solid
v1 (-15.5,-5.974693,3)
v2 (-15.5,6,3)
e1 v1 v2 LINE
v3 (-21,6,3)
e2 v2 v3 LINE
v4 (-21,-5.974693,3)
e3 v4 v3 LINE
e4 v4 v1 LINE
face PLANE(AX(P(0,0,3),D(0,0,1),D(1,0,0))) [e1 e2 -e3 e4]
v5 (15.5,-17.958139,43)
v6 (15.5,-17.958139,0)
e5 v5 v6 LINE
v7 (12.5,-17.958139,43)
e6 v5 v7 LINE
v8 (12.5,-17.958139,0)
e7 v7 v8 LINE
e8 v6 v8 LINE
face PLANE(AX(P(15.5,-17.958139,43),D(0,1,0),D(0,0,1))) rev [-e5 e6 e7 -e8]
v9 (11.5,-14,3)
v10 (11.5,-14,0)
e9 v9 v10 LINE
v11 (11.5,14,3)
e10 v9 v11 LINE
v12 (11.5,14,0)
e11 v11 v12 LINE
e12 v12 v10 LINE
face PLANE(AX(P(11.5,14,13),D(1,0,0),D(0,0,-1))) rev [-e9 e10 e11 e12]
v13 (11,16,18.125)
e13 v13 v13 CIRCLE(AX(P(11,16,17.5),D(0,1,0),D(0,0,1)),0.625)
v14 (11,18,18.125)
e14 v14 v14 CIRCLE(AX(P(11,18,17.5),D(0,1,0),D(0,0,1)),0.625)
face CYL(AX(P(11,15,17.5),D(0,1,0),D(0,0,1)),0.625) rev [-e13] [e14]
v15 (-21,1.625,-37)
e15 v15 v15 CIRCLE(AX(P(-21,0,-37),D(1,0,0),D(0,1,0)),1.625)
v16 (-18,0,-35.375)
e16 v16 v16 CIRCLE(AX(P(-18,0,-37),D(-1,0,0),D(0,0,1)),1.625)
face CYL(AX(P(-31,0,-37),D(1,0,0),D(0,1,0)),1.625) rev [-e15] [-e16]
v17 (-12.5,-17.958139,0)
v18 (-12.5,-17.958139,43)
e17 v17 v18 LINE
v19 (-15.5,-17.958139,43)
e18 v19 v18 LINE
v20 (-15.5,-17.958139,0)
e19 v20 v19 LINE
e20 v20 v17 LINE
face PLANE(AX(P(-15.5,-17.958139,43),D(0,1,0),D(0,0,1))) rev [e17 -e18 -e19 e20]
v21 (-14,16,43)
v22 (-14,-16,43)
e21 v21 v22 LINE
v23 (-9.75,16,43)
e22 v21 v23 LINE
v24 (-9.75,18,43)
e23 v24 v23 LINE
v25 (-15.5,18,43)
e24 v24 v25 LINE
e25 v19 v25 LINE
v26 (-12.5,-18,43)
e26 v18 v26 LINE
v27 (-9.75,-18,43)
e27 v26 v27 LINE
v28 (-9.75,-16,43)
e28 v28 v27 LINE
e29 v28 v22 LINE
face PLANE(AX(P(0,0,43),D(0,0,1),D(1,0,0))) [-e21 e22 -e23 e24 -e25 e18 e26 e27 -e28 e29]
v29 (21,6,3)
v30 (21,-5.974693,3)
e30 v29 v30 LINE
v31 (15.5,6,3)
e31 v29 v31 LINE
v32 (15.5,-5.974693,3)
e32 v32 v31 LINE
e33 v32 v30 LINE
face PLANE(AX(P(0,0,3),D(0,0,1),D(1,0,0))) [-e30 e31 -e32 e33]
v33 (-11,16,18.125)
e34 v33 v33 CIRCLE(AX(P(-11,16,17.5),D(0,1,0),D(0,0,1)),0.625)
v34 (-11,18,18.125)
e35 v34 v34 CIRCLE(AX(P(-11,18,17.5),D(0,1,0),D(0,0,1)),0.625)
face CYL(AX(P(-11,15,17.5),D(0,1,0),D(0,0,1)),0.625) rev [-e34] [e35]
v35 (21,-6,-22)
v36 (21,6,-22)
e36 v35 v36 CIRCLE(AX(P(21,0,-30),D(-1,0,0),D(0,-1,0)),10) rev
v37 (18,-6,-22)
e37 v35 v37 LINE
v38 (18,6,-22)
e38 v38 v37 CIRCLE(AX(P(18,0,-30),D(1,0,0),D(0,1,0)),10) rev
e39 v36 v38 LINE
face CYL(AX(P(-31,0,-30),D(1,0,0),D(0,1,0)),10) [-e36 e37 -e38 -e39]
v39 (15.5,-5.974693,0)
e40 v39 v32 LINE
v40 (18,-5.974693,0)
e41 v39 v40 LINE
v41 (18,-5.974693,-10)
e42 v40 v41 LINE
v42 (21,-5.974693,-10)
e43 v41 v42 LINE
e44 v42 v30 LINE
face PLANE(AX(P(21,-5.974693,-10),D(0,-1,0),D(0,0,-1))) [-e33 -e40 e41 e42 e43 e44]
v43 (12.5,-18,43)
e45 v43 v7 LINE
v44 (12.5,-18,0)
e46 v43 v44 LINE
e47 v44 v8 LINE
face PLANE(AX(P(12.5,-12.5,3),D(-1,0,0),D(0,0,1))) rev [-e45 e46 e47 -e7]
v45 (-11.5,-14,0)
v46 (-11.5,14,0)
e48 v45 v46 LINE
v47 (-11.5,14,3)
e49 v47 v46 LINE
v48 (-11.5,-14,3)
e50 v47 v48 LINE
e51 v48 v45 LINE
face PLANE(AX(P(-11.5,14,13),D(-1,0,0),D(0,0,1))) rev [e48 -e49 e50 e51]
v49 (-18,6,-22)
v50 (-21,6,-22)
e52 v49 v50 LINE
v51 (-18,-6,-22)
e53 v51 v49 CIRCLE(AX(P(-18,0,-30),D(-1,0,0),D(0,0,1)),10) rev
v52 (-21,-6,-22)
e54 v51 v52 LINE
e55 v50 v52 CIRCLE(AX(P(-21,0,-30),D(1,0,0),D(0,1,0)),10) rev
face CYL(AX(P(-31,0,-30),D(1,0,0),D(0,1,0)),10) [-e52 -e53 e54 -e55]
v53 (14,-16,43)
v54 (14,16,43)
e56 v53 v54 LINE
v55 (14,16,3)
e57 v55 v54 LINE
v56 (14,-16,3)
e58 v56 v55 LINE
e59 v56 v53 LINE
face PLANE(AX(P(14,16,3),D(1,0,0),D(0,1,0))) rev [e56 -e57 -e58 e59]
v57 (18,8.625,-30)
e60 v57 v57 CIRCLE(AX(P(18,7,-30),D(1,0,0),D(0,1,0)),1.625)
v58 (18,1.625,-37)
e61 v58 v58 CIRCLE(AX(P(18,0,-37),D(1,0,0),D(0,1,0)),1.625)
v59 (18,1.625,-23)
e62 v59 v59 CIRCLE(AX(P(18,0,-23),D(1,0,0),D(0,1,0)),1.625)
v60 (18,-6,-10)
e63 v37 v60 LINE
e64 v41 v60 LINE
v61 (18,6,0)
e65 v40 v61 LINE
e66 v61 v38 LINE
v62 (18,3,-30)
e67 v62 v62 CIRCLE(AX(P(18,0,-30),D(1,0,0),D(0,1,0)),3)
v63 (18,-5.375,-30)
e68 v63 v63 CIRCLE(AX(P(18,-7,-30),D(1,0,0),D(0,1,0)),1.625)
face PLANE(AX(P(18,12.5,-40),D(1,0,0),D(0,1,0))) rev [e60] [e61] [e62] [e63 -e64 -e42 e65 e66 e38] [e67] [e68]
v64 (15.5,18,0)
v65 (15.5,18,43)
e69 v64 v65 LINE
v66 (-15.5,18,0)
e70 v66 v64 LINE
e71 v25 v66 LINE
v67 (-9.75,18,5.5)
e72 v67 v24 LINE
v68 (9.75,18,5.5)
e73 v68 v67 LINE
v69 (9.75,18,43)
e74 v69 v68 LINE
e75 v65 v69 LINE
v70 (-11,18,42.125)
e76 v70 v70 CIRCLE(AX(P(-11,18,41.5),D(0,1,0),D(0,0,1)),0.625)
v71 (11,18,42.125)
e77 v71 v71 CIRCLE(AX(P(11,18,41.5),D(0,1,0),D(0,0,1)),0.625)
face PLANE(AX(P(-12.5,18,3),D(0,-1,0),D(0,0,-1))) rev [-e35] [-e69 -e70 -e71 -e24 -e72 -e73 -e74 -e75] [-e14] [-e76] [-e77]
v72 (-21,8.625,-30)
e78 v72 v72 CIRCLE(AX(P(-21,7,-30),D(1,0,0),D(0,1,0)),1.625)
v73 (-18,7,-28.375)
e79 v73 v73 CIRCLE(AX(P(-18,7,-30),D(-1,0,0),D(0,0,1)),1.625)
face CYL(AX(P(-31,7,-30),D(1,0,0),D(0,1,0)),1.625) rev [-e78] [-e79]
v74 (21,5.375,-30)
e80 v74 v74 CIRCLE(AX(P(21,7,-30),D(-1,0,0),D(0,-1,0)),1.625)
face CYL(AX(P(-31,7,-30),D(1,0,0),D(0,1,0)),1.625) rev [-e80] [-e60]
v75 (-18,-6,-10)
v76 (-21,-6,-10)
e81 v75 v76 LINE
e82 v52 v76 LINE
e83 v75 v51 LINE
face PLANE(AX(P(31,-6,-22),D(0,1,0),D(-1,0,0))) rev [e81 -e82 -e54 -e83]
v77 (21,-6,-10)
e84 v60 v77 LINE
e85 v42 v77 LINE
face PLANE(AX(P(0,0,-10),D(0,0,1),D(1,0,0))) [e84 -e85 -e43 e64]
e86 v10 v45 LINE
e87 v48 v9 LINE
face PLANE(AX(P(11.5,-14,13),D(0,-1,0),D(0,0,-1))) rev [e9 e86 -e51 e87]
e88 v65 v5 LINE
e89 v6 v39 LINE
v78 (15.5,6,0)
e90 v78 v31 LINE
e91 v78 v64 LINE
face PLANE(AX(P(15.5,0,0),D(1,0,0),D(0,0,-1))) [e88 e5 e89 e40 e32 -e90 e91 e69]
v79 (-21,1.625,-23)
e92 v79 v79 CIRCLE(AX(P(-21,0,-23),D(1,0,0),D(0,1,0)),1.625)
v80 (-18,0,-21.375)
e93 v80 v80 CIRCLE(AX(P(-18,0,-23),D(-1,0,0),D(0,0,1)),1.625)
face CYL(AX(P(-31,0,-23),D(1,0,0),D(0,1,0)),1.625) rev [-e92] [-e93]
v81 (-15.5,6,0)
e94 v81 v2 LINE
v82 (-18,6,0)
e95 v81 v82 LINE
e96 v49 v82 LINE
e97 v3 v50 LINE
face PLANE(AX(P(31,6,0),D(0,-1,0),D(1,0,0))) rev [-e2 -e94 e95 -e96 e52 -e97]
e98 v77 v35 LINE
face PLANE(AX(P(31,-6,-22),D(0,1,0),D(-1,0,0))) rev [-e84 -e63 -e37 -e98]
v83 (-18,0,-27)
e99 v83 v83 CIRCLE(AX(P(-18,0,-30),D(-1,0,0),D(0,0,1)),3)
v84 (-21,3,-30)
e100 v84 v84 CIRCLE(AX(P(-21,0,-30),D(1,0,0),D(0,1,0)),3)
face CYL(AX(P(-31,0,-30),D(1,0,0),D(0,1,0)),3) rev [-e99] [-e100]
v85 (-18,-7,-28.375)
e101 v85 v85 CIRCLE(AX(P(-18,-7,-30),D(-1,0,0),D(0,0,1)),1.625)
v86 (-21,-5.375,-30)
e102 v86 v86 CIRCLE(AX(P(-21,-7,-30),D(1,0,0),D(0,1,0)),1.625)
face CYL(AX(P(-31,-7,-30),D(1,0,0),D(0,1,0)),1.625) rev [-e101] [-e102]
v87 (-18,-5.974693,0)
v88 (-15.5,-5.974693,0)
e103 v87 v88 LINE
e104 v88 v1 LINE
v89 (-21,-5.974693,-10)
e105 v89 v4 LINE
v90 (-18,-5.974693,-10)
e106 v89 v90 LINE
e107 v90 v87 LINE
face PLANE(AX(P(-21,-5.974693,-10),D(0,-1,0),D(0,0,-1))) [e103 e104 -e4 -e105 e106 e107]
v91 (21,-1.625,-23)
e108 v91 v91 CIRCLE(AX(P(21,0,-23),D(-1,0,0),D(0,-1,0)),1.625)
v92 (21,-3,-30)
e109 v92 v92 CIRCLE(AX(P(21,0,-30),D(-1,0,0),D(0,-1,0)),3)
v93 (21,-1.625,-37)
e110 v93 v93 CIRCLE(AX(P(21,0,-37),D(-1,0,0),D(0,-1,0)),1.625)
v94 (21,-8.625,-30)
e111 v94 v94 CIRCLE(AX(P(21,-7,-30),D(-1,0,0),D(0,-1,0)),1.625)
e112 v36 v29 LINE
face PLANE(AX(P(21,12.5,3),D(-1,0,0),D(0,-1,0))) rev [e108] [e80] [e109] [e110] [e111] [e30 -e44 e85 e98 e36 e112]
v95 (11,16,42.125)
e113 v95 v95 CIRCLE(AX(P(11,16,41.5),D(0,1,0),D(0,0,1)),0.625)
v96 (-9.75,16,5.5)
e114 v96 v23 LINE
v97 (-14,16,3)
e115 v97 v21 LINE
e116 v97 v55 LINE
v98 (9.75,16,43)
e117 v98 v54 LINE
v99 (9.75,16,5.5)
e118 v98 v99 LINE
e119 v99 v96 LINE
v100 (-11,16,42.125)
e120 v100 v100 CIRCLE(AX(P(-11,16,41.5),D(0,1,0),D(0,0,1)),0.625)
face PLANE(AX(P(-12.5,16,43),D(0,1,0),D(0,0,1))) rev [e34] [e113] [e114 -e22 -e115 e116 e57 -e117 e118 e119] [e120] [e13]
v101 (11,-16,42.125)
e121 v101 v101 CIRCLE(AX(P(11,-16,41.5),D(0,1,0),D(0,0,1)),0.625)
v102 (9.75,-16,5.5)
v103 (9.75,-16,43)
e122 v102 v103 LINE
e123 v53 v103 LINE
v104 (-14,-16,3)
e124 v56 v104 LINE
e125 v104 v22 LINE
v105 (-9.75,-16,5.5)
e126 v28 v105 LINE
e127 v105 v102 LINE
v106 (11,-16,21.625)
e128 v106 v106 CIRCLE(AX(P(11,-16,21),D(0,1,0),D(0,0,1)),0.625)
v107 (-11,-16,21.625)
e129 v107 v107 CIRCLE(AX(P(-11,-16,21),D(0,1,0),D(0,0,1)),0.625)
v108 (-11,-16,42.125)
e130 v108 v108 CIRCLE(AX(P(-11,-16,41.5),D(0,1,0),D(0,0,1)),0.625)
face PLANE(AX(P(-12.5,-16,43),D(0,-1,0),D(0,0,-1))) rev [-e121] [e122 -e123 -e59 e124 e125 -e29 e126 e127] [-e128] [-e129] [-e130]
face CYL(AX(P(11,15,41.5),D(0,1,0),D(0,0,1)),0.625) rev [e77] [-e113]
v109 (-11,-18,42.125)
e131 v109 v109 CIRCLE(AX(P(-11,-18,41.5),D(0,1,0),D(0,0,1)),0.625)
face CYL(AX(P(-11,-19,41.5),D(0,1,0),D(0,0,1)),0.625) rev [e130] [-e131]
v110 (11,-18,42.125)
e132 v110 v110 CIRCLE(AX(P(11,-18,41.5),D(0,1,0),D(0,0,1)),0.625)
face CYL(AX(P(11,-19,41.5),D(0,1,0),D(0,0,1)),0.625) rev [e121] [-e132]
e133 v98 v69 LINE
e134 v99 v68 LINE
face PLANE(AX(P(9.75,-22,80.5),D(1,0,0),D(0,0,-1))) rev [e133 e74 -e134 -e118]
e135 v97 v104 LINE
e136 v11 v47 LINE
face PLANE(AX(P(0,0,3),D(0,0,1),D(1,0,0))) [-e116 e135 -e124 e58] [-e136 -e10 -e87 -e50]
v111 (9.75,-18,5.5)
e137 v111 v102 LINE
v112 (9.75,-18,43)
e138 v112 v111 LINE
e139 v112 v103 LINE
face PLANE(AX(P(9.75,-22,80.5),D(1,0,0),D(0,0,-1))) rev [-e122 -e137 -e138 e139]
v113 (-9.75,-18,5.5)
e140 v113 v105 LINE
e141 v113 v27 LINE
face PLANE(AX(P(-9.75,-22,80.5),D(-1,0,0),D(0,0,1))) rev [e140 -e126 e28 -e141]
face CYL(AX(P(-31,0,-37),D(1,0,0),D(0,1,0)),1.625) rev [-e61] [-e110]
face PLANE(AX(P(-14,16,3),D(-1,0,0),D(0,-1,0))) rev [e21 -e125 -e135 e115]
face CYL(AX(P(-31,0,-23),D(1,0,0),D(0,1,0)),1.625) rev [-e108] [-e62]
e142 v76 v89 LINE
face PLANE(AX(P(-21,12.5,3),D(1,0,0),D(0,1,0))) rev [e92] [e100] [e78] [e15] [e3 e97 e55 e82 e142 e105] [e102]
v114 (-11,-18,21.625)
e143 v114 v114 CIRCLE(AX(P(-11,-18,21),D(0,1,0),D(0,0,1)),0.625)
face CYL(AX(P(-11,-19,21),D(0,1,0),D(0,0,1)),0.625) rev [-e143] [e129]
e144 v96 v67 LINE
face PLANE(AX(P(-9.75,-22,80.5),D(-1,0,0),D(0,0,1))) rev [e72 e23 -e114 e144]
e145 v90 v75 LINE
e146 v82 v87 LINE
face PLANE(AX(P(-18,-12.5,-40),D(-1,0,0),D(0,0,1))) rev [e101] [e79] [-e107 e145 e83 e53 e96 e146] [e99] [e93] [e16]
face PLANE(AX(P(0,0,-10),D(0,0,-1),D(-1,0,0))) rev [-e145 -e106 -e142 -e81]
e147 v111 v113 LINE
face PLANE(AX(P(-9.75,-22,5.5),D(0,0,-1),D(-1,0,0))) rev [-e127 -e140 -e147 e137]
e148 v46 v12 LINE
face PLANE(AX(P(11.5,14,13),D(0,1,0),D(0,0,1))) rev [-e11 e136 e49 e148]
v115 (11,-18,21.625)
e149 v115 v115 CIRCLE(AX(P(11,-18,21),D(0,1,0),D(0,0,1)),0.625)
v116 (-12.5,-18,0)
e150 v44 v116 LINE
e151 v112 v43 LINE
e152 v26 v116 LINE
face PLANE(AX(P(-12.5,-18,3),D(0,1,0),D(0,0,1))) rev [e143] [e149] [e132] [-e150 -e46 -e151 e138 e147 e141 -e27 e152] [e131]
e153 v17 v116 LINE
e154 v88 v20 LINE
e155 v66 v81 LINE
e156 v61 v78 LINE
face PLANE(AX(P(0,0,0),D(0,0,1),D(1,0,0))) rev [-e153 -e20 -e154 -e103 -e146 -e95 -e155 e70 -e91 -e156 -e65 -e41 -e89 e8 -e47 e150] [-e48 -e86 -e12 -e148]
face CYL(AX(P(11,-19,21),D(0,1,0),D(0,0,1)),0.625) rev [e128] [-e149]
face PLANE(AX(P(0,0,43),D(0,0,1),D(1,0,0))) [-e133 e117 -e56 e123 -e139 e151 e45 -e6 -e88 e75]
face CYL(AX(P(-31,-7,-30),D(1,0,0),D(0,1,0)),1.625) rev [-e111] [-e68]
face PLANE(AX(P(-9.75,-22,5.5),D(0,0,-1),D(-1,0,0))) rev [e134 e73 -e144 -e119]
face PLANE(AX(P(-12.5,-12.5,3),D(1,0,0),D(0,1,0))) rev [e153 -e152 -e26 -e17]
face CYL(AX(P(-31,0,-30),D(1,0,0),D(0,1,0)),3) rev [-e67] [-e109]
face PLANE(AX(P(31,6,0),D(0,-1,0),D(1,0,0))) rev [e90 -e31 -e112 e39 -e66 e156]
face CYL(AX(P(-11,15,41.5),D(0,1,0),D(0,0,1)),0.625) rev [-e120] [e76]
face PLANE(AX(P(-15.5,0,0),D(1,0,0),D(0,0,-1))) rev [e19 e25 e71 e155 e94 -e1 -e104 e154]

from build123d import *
from build123d.topology import SkipClean

# Parameters (mm, degrees)
BOSS_EXTRUDE1_DEPTH      = 3
SKETCH2_W                = 25
SKETCH2_H                = 2
BOSS_EXTRUDE2_DEPTH      = 40
SKETCH3_R                = 0.625
CUT_EXTRUDE1_DEPTH       = 3
SKETCH4_R                = 0.625
CUT_EXTRUDE2_DEPTH       = 3
SKETCH5_W                = 3
SKETCH5_H                = 25
BOSS_EXTRUDE3_DEPTH      = 40
SKETCH7_W                = 19.5
SKETCH7_H                = 75
CUT_EXTRUDE5_DEPTH       = 40
SKETCH10_W               = 25
SKETCH10_H               = 3
BOSS_EXTRUDE4_DEPTH      = 10
SKETCH11_W               = 25
SKETCH11_H               = 3
BOSS_EXTRUDE5_DEPTH      = 10
SKETCH12_W               = 3
SKETCH12_H               = 25
BOSS_EXTRUDE6_DEPTH      = 10
SKETCH13_W               = 3
SKETCH13_H               = 25
BOSS_EXTRUDE7_DEPTH      = 10
SKETCH14_W               = 43
SKETCH14_H               = 35.95813892
BOSS_EXTRUDE11_DEPTH     = 3
SKETCH15_W               = 43
SKETCH15_H               = 35.95813892
BOSS_EXTRUDE12_DEPTH     = 3
SKETCH16_W               = 23
SKETCH16_H               = 28
CUT_EXTRUDE6_DEPTH       = 13
CUT_EXTRUDE7_DEPTH       = 74.054773971
CUT_EXTRUDE7_DEPTH_BACK  = 74.054773971
SKETCH6_R                = 1.625
SKETCH6_R_2              = 3
FILLET1_R                = 10
FILLET2_R                = 10
SKETCH17_W               = 3
SKETCH17_H               = 2.5
CUT_EXTRUDE8_DEPTH       = 30
SKETCH19_W               = 28
SKETCH19_H               = 32
CUT_EXTRUDE9_DEPTH       = 40
CUT_EXTRUDE11_DEPTH      = 60.949979149
CUT_EXTRUDE11_DEPTH_BACK = 60.949979149
SKETCH20_W               = 25.25
SKETCH20_H               = 11.847644437
SKETCH20_W_2             = 25
SKETCH20_H_2             = 13.837487399
CUT_EXTRUDE12_DEPTH      = 70.835521048
CUT_EXTRUDE12_DEPTH_BACK = 70.835521048
CUT_EXTRUDE13_DEPTH      = 56.982140009
CUT_EXTRUDE13_DEPTH_BACK = 56.982140009
SKETCH22_W               = 10
SKETCH22_H               = 25
CUT_EXTRUDE14_DEPTH      = 10
CUT_EXTRUDE14_DEPTH_BACK = 10
SKETCH24_W               = 5.5
SKETCH24_H               = 6.5
SKETCH24_H_2             = 6.525307194


with BuildPart() as part:
    # Sketch1 → Boss-Extrude1 (new body)
    with BuildSketch(Plane.XY):
        Polygon((12.5, 12.5), (21, 12.5), (21, -12.5), (12.5, -12.5), (12.5, -18), (-12.5, -18), (-12.5, -12.5), (-21, -12.5), (-21, 12.5), (-12.5, 12.5), (-12.5, 18), (12.5, 18), align=None)
    extrude(amount=BOSS_EXTRUDE1_DEPTH)

    # Sketch2 → Boss-Extrude2 (add)
    with BuildSketch(Plane.XY.offset(3)):
        with Locations((0, 17)):
            Rectangle(SKETCH2_W, SKETCH2_H)
        with Locations((0, -17)):
            Rectangle(SKETCH2_W, SKETCH2_H)
    extrude(amount=BOSS_EXTRUDE2_DEPTH)

    # Sketch3 → Cut-Extrude1 (cut)
    with BuildSketch(Plane(origin=(0, 18, 0), x_dir=(1, 0, 0), z_dir=(0, 1, 0))):
        with Locations(Location((-11, -17.5, 0), (0, 0, 270))):
            Circle(SKETCH3_R)
        with Locations(Location((11, -17.5, 0), (0, 0, 270))):
            Circle(SKETCH3_R)
        with Locations(Location((-11, -41.5, 0), (0, 0, 270))):
            Circle(SKETCH3_R)
        with Locations(Location((11, -41.5, 0), (0, 0, 270))):
            Circle(SKETCH3_R)
    extrude(amount=-CUT_EXTRUDE1_DEPTH, mode=Mode.SUBTRACT)

    # Sketch4 → Cut-Extrude2 (cut)
    with BuildSketch(Plane(origin=(0, -16, 0), x_dir=(1, 0, 0), z_dir=(0, 1, 0))):
        with Locations(Location((-11, -41.5, 0), (0, 0, 270))):
            Circle(SKETCH4_R)
        with Locations(Location((11, -41.5, 0), (0, 0, 270))):
            Circle(SKETCH4_R)
        with Locations(Location((-11, -21, 0), (0, 0, 270))):
            Circle(SKETCH4_R)
        with Locations(Location((11, -21, 0), (0, 0, 270))):
            Circle(SKETCH4_R)
    extrude(amount=-CUT_EXTRUDE2_DEPTH, mode=Mode.SUBTRACT)

    # Sketch5 → Boss-Extrude3 (add)
    with BuildSketch(Plane(origin=(0, 0, 0), x_dir=(-1, 0, 0), z_dir=(0, 0, -1))):
        with Locations((-19.5, 0)):
            Rectangle(SKETCH5_W, SKETCH5_H)
        with Locations((19.5, 0)):
            Rectangle(SKETCH5_W, SKETCH5_H)
    extrude(amount=BOSS_EXTRUDE3_DEPTH)

    # Sketch7 → Cut-Extrude5 (cut)
    with BuildSketch(Plane(origin=(0, 18, 0), x_dir=(1, 0, 0), z_dir=(0, 1, 0))):
        with Locations((0, -43)):
            Rectangle(SKETCH7_W, SKETCH7_H)
    extrude(amount=-CUT_EXTRUDE5_DEPTH, mode=Mode.SUBTRACT)

    # Sketch10 → Boss-Extrude4 (add)
    with BuildSketch(Plane(origin=(0, 18, 0), x_dir=(1, 0, 0), z_dir=(0, 1, 0))):
        with Locations((0, -1.5)):
            Rectangle(SKETCH10_W, SKETCH10_H)
    extrude(amount=BOSS_EXTRUDE4_DEPTH)

    # Sketch11 → Boss-Extrude5 (add)
    with BuildSketch(Plane.XZ.offset(18)):
        with Locations((0, 1.5)):
            Rectangle(SKETCH11_W, SKETCH11_H)
    extrude(amount=BOSS_EXTRUDE5_DEPTH)

    # Sketch12 → Boss-Extrude6 (add)
    with BuildSketch(Plane.ZY.offset(21)):
        with Locations((1.5, 0)):
            Rectangle(SKETCH12_W, SKETCH12_H)
    extrude(amount=BOSS_EXTRUDE6_DEPTH)

    # Sketch13 → Boss-Extrude7 (add)
    with BuildSketch(Plane(origin=(21, 0, 0), x_dir=(0, 0, -1), z_dir=(1, 0, 0))):
        with Locations((-1.5, 0)):
            Rectangle(SKETCH13_W, SKETCH13_H)
    extrude(amount=BOSS_EXTRUDE7_DEPTH)

    # Sketch14 → Boss-Extrude11 (add)
    with BuildSketch(Plane.ZY.offset(12.5)):
        with Locations((21.5, 0.02093054)):
            Rectangle(SKETCH14_W, SKETCH14_H)
    extrude(amount=BOSS_EXTRUDE11_DEPTH)

    # Sketch15 → Boss-Extrude12 (add)
    with BuildSketch(Plane(origin=(12.5, 0, 0), x_dir=(0, 0, -1), z_dir=(1, 0, 0))):
        with Locations((-21.5, 0.02093054)):
            Rectangle(SKETCH15_W, SKETCH15_H)
    extrude(amount=BOSS_EXTRUDE12_DEPTH)

    # Sketch16 → Cut-Extrude6 (cut)
    with BuildSketch(Plane(origin=(0, 0, 0), x_dir=(-1, 0, 0), z_dir=(0, 0, -1))):
        Rectangle(SKETCH16_W, SKETCH16_H)
    extrude(amount=-CUT_EXTRUDE6_DEPTH, mode=Mode.SUBTRACT)

    # Sketch6 → Cut-Extrude7 (cut, two sides: drawn at the far end of the back side and taken through both)
    with BuildSketch(Plane(origin=(21, 0, 0), x_dir=(0, 0, -1), z_dir=(1, 0, 0)).offset(-CUT_EXTRUDE7_DEPTH_BACK)):
        with Locations(Location((30, 7, 0), (0, 0, 90))):
            Circle(SKETCH6_R)
        with Locations(Location((30, 0, 0), (0, 0, 90))):
            Circle(SKETCH6_R_2)
        with Locations(Location((37, 0, 0), (0, 0, 90))):
            Circle(SKETCH6_R)
        with Locations(Location((30, -7, 0), (0, 0, 90))):
            Circle(SKETCH6_R)
        with Locations(Location((23, 0, 0), (0, 0, 90))):
            Circle(SKETCH6_R)
        with BuildLine():
            Line((30, 10), (30, 12.5))
            Line((30, 12.5), (46.457343261, 12.5))
            Line((46.457343261, 12.5), (46.457343261, -12.5))
            Line((46.457343261, -12.5), (30, -12.5))
            Line((30, -12.5), (30, -10))
            ThreePointArc((30, -10), (40, 0), (30, 10))
        make_face()
    extrude(amount=CUT_EXTRUDE7_DEPTH + CUT_EXTRUDE7_DEPTH_BACK, mode=Mode.SUBTRACT)

    # Fillet1
    fillet1_edges = [part.edges().sort_by_distance(p)[0] for p in [
        (31, 12.5, 1.5),
    ]]
    fillet(fillet1_edges, radius=FILLET1_R)

    # Fillet2
    fillet2_edges = [part.edges().sort_by_distance(p)[0] for p in [
        (12.5, 28, 1.5),
        (-12.5, 28, 1.5),
        (-31, 12.5, 1.5),
        (12.5, -28, 1.5),
        (-31, -12.5, 1.5),
        (-12.5, -28, 1.5),
        (31, -12.5, 1.5),
    ]]
    fillet(fillet2_edges, radius=FILLET2_R - 0.0001)  # a hair under: the kernel refuses the full size

    # Sketch17 → Cut-Extrude8 (cut)
    with BuildSketch(Plane(origin=(0, 0, -30), x_dir=(-1, 0, 0), z_dir=(0, 0, -1))):
        with Locations((-19.5, 11.25)):
            Rectangle(SKETCH17_W, SKETCH17_H)
        with Locations((-19.5, -11.25)):
            Rectangle(SKETCH17_W, SKETCH17_H)
        with Locations((19.5, 11.25)):
            Rectangle(SKETCH17_W, SKETCH17_H)
        with Locations((19.5, -11.25)):
            Rectangle(SKETCH17_W, SKETCH17_H)
    extrude(amount=-CUT_EXTRUDE8_DEPTH, mode=Mode.SUBTRACT)

    # Sketch19 → Cut-Extrude9 (cut)
    with BuildSketch(Plane.XY.offset(43)):
        Rectangle(SKETCH19_W, SKETCH19_H)
    extrude(amount=-CUT_EXTRUDE9_DEPTH, mode=Mode.SUBTRACT)

    # Sketch20 → Cut-Extrude11 (cut, two sides: drawn at the far end of the back side and taken through both)
    with BuildSketch(Plane.XY.offset(3).offset(-CUT_EXTRUDE11_DEPTH_BACK)):
        with Locations((0, 23.923822218)):
            Rectangle(SKETCH20_W, SKETCH20_H)
        with Locations((0, -24.918743699)):
            Rectangle(SKETCH20_W_2, SKETCH20_H_2)
    extrude(amount=CUT_EXTRUDE11_DEPTH + CUT_EXTRUDE11_DEPTH_BACK, mode=Mode.SUBTRACT)

    # Sketch21 → Cut-Extrude12 (cut, two sides: drawn at the far end of the back side and taken through both)
    with SkipClean():  # the faces are left unmerged after this step: merging them gives an invalid solid
        with BuildSketch(Plane.ZY.offset(21).offset(-CUT_EXTRUDE12_DEPTH_BACK)):
            with BuildLine():
                Line((-30, 10), (0, 10))
                Line((0, 10), (0, 6))
                Line((0, 6), (-22, 6))
                ThreePointArc((-22, 6), (-25.527864045, 8.94427191), (-30, 10))
            make_face()
            with BuildLine():
                Line((-22, -6), (0, -6))
                Line((0, -6), (0, -10))
                Line((0, -10), (-30, -10))
                ThreePointArc((-30, -10), (-25.527864045, -8.94427191), (-22, -6))
            make_face()
        extrude(amount=CUT_EXTRUDE12_DEPTH + CUT_EXTRUDE12_DEPTH_BACK, mode=Mode.SUBTRACT)

    # Sketch22 → Cut-Extrude13 (cut, two sides: drawn at the far end of the back side and taken through both)
    with SkipClean():  # the faces are left unmerged after this step: merging them gives an invalid solid
        with BuildSketch(Plane(origin=(0, 0, 0), x_dir=(-1, 0, 0), z_dir=(0, 0, -1)).offset(-CUT_EXTRUDE13_DEPTH_BACK)):
            with Locations((26, 0)):
                Rectangle(SKETCH22_W, SKETCH22_H)
            with Locations((-26, 0)):
                Rectangle(SKETCH22_W, SKETCH22_H)
        extrude(amount=CUT_EXTRUDE13_DEPTH + CUT_EXTRUDE13_DEPTH_BACK, mode=Mode.SUBTRACT)

    # Sketch24 → Cut-Extrude14 (cut, two sides: drawn at the far end of the back side and taken through both)
    with SkipClean():  # the faces are left unmerged after this step: merging them gives an invalid solid
        with BuildSketch(Plane(origin=(0, 0, 0), x_dir=(-1, 0, 0), z_dir=(0, 0, -1)).offset(-CUT_EXTRUDE14_DEPTH_BACK)):
            with Locations((18.25, 9.25)):
                Rectangle(SKETCH24_W, SKETCH24_H)
            with Locations((18.25, -9.237346403)):
                Rectangle(SKETCH24_W, SKETCH24_H_2)
            with Locations((-18.25, -9.237346403)):
                Rectangle(SKETCH24_W, SKETCH24_H_2)
            with Locations((-18.25, 9.25)):
                Rectangle(SKETCH24_W, SKETCH24_H)
        extrude(amount=CUT_EXTRUDE14_DEPTH + CUT_EXTRUDE14_DEPTH_BACK, mode=Mode.SUBTRACT)


solid = part.part
